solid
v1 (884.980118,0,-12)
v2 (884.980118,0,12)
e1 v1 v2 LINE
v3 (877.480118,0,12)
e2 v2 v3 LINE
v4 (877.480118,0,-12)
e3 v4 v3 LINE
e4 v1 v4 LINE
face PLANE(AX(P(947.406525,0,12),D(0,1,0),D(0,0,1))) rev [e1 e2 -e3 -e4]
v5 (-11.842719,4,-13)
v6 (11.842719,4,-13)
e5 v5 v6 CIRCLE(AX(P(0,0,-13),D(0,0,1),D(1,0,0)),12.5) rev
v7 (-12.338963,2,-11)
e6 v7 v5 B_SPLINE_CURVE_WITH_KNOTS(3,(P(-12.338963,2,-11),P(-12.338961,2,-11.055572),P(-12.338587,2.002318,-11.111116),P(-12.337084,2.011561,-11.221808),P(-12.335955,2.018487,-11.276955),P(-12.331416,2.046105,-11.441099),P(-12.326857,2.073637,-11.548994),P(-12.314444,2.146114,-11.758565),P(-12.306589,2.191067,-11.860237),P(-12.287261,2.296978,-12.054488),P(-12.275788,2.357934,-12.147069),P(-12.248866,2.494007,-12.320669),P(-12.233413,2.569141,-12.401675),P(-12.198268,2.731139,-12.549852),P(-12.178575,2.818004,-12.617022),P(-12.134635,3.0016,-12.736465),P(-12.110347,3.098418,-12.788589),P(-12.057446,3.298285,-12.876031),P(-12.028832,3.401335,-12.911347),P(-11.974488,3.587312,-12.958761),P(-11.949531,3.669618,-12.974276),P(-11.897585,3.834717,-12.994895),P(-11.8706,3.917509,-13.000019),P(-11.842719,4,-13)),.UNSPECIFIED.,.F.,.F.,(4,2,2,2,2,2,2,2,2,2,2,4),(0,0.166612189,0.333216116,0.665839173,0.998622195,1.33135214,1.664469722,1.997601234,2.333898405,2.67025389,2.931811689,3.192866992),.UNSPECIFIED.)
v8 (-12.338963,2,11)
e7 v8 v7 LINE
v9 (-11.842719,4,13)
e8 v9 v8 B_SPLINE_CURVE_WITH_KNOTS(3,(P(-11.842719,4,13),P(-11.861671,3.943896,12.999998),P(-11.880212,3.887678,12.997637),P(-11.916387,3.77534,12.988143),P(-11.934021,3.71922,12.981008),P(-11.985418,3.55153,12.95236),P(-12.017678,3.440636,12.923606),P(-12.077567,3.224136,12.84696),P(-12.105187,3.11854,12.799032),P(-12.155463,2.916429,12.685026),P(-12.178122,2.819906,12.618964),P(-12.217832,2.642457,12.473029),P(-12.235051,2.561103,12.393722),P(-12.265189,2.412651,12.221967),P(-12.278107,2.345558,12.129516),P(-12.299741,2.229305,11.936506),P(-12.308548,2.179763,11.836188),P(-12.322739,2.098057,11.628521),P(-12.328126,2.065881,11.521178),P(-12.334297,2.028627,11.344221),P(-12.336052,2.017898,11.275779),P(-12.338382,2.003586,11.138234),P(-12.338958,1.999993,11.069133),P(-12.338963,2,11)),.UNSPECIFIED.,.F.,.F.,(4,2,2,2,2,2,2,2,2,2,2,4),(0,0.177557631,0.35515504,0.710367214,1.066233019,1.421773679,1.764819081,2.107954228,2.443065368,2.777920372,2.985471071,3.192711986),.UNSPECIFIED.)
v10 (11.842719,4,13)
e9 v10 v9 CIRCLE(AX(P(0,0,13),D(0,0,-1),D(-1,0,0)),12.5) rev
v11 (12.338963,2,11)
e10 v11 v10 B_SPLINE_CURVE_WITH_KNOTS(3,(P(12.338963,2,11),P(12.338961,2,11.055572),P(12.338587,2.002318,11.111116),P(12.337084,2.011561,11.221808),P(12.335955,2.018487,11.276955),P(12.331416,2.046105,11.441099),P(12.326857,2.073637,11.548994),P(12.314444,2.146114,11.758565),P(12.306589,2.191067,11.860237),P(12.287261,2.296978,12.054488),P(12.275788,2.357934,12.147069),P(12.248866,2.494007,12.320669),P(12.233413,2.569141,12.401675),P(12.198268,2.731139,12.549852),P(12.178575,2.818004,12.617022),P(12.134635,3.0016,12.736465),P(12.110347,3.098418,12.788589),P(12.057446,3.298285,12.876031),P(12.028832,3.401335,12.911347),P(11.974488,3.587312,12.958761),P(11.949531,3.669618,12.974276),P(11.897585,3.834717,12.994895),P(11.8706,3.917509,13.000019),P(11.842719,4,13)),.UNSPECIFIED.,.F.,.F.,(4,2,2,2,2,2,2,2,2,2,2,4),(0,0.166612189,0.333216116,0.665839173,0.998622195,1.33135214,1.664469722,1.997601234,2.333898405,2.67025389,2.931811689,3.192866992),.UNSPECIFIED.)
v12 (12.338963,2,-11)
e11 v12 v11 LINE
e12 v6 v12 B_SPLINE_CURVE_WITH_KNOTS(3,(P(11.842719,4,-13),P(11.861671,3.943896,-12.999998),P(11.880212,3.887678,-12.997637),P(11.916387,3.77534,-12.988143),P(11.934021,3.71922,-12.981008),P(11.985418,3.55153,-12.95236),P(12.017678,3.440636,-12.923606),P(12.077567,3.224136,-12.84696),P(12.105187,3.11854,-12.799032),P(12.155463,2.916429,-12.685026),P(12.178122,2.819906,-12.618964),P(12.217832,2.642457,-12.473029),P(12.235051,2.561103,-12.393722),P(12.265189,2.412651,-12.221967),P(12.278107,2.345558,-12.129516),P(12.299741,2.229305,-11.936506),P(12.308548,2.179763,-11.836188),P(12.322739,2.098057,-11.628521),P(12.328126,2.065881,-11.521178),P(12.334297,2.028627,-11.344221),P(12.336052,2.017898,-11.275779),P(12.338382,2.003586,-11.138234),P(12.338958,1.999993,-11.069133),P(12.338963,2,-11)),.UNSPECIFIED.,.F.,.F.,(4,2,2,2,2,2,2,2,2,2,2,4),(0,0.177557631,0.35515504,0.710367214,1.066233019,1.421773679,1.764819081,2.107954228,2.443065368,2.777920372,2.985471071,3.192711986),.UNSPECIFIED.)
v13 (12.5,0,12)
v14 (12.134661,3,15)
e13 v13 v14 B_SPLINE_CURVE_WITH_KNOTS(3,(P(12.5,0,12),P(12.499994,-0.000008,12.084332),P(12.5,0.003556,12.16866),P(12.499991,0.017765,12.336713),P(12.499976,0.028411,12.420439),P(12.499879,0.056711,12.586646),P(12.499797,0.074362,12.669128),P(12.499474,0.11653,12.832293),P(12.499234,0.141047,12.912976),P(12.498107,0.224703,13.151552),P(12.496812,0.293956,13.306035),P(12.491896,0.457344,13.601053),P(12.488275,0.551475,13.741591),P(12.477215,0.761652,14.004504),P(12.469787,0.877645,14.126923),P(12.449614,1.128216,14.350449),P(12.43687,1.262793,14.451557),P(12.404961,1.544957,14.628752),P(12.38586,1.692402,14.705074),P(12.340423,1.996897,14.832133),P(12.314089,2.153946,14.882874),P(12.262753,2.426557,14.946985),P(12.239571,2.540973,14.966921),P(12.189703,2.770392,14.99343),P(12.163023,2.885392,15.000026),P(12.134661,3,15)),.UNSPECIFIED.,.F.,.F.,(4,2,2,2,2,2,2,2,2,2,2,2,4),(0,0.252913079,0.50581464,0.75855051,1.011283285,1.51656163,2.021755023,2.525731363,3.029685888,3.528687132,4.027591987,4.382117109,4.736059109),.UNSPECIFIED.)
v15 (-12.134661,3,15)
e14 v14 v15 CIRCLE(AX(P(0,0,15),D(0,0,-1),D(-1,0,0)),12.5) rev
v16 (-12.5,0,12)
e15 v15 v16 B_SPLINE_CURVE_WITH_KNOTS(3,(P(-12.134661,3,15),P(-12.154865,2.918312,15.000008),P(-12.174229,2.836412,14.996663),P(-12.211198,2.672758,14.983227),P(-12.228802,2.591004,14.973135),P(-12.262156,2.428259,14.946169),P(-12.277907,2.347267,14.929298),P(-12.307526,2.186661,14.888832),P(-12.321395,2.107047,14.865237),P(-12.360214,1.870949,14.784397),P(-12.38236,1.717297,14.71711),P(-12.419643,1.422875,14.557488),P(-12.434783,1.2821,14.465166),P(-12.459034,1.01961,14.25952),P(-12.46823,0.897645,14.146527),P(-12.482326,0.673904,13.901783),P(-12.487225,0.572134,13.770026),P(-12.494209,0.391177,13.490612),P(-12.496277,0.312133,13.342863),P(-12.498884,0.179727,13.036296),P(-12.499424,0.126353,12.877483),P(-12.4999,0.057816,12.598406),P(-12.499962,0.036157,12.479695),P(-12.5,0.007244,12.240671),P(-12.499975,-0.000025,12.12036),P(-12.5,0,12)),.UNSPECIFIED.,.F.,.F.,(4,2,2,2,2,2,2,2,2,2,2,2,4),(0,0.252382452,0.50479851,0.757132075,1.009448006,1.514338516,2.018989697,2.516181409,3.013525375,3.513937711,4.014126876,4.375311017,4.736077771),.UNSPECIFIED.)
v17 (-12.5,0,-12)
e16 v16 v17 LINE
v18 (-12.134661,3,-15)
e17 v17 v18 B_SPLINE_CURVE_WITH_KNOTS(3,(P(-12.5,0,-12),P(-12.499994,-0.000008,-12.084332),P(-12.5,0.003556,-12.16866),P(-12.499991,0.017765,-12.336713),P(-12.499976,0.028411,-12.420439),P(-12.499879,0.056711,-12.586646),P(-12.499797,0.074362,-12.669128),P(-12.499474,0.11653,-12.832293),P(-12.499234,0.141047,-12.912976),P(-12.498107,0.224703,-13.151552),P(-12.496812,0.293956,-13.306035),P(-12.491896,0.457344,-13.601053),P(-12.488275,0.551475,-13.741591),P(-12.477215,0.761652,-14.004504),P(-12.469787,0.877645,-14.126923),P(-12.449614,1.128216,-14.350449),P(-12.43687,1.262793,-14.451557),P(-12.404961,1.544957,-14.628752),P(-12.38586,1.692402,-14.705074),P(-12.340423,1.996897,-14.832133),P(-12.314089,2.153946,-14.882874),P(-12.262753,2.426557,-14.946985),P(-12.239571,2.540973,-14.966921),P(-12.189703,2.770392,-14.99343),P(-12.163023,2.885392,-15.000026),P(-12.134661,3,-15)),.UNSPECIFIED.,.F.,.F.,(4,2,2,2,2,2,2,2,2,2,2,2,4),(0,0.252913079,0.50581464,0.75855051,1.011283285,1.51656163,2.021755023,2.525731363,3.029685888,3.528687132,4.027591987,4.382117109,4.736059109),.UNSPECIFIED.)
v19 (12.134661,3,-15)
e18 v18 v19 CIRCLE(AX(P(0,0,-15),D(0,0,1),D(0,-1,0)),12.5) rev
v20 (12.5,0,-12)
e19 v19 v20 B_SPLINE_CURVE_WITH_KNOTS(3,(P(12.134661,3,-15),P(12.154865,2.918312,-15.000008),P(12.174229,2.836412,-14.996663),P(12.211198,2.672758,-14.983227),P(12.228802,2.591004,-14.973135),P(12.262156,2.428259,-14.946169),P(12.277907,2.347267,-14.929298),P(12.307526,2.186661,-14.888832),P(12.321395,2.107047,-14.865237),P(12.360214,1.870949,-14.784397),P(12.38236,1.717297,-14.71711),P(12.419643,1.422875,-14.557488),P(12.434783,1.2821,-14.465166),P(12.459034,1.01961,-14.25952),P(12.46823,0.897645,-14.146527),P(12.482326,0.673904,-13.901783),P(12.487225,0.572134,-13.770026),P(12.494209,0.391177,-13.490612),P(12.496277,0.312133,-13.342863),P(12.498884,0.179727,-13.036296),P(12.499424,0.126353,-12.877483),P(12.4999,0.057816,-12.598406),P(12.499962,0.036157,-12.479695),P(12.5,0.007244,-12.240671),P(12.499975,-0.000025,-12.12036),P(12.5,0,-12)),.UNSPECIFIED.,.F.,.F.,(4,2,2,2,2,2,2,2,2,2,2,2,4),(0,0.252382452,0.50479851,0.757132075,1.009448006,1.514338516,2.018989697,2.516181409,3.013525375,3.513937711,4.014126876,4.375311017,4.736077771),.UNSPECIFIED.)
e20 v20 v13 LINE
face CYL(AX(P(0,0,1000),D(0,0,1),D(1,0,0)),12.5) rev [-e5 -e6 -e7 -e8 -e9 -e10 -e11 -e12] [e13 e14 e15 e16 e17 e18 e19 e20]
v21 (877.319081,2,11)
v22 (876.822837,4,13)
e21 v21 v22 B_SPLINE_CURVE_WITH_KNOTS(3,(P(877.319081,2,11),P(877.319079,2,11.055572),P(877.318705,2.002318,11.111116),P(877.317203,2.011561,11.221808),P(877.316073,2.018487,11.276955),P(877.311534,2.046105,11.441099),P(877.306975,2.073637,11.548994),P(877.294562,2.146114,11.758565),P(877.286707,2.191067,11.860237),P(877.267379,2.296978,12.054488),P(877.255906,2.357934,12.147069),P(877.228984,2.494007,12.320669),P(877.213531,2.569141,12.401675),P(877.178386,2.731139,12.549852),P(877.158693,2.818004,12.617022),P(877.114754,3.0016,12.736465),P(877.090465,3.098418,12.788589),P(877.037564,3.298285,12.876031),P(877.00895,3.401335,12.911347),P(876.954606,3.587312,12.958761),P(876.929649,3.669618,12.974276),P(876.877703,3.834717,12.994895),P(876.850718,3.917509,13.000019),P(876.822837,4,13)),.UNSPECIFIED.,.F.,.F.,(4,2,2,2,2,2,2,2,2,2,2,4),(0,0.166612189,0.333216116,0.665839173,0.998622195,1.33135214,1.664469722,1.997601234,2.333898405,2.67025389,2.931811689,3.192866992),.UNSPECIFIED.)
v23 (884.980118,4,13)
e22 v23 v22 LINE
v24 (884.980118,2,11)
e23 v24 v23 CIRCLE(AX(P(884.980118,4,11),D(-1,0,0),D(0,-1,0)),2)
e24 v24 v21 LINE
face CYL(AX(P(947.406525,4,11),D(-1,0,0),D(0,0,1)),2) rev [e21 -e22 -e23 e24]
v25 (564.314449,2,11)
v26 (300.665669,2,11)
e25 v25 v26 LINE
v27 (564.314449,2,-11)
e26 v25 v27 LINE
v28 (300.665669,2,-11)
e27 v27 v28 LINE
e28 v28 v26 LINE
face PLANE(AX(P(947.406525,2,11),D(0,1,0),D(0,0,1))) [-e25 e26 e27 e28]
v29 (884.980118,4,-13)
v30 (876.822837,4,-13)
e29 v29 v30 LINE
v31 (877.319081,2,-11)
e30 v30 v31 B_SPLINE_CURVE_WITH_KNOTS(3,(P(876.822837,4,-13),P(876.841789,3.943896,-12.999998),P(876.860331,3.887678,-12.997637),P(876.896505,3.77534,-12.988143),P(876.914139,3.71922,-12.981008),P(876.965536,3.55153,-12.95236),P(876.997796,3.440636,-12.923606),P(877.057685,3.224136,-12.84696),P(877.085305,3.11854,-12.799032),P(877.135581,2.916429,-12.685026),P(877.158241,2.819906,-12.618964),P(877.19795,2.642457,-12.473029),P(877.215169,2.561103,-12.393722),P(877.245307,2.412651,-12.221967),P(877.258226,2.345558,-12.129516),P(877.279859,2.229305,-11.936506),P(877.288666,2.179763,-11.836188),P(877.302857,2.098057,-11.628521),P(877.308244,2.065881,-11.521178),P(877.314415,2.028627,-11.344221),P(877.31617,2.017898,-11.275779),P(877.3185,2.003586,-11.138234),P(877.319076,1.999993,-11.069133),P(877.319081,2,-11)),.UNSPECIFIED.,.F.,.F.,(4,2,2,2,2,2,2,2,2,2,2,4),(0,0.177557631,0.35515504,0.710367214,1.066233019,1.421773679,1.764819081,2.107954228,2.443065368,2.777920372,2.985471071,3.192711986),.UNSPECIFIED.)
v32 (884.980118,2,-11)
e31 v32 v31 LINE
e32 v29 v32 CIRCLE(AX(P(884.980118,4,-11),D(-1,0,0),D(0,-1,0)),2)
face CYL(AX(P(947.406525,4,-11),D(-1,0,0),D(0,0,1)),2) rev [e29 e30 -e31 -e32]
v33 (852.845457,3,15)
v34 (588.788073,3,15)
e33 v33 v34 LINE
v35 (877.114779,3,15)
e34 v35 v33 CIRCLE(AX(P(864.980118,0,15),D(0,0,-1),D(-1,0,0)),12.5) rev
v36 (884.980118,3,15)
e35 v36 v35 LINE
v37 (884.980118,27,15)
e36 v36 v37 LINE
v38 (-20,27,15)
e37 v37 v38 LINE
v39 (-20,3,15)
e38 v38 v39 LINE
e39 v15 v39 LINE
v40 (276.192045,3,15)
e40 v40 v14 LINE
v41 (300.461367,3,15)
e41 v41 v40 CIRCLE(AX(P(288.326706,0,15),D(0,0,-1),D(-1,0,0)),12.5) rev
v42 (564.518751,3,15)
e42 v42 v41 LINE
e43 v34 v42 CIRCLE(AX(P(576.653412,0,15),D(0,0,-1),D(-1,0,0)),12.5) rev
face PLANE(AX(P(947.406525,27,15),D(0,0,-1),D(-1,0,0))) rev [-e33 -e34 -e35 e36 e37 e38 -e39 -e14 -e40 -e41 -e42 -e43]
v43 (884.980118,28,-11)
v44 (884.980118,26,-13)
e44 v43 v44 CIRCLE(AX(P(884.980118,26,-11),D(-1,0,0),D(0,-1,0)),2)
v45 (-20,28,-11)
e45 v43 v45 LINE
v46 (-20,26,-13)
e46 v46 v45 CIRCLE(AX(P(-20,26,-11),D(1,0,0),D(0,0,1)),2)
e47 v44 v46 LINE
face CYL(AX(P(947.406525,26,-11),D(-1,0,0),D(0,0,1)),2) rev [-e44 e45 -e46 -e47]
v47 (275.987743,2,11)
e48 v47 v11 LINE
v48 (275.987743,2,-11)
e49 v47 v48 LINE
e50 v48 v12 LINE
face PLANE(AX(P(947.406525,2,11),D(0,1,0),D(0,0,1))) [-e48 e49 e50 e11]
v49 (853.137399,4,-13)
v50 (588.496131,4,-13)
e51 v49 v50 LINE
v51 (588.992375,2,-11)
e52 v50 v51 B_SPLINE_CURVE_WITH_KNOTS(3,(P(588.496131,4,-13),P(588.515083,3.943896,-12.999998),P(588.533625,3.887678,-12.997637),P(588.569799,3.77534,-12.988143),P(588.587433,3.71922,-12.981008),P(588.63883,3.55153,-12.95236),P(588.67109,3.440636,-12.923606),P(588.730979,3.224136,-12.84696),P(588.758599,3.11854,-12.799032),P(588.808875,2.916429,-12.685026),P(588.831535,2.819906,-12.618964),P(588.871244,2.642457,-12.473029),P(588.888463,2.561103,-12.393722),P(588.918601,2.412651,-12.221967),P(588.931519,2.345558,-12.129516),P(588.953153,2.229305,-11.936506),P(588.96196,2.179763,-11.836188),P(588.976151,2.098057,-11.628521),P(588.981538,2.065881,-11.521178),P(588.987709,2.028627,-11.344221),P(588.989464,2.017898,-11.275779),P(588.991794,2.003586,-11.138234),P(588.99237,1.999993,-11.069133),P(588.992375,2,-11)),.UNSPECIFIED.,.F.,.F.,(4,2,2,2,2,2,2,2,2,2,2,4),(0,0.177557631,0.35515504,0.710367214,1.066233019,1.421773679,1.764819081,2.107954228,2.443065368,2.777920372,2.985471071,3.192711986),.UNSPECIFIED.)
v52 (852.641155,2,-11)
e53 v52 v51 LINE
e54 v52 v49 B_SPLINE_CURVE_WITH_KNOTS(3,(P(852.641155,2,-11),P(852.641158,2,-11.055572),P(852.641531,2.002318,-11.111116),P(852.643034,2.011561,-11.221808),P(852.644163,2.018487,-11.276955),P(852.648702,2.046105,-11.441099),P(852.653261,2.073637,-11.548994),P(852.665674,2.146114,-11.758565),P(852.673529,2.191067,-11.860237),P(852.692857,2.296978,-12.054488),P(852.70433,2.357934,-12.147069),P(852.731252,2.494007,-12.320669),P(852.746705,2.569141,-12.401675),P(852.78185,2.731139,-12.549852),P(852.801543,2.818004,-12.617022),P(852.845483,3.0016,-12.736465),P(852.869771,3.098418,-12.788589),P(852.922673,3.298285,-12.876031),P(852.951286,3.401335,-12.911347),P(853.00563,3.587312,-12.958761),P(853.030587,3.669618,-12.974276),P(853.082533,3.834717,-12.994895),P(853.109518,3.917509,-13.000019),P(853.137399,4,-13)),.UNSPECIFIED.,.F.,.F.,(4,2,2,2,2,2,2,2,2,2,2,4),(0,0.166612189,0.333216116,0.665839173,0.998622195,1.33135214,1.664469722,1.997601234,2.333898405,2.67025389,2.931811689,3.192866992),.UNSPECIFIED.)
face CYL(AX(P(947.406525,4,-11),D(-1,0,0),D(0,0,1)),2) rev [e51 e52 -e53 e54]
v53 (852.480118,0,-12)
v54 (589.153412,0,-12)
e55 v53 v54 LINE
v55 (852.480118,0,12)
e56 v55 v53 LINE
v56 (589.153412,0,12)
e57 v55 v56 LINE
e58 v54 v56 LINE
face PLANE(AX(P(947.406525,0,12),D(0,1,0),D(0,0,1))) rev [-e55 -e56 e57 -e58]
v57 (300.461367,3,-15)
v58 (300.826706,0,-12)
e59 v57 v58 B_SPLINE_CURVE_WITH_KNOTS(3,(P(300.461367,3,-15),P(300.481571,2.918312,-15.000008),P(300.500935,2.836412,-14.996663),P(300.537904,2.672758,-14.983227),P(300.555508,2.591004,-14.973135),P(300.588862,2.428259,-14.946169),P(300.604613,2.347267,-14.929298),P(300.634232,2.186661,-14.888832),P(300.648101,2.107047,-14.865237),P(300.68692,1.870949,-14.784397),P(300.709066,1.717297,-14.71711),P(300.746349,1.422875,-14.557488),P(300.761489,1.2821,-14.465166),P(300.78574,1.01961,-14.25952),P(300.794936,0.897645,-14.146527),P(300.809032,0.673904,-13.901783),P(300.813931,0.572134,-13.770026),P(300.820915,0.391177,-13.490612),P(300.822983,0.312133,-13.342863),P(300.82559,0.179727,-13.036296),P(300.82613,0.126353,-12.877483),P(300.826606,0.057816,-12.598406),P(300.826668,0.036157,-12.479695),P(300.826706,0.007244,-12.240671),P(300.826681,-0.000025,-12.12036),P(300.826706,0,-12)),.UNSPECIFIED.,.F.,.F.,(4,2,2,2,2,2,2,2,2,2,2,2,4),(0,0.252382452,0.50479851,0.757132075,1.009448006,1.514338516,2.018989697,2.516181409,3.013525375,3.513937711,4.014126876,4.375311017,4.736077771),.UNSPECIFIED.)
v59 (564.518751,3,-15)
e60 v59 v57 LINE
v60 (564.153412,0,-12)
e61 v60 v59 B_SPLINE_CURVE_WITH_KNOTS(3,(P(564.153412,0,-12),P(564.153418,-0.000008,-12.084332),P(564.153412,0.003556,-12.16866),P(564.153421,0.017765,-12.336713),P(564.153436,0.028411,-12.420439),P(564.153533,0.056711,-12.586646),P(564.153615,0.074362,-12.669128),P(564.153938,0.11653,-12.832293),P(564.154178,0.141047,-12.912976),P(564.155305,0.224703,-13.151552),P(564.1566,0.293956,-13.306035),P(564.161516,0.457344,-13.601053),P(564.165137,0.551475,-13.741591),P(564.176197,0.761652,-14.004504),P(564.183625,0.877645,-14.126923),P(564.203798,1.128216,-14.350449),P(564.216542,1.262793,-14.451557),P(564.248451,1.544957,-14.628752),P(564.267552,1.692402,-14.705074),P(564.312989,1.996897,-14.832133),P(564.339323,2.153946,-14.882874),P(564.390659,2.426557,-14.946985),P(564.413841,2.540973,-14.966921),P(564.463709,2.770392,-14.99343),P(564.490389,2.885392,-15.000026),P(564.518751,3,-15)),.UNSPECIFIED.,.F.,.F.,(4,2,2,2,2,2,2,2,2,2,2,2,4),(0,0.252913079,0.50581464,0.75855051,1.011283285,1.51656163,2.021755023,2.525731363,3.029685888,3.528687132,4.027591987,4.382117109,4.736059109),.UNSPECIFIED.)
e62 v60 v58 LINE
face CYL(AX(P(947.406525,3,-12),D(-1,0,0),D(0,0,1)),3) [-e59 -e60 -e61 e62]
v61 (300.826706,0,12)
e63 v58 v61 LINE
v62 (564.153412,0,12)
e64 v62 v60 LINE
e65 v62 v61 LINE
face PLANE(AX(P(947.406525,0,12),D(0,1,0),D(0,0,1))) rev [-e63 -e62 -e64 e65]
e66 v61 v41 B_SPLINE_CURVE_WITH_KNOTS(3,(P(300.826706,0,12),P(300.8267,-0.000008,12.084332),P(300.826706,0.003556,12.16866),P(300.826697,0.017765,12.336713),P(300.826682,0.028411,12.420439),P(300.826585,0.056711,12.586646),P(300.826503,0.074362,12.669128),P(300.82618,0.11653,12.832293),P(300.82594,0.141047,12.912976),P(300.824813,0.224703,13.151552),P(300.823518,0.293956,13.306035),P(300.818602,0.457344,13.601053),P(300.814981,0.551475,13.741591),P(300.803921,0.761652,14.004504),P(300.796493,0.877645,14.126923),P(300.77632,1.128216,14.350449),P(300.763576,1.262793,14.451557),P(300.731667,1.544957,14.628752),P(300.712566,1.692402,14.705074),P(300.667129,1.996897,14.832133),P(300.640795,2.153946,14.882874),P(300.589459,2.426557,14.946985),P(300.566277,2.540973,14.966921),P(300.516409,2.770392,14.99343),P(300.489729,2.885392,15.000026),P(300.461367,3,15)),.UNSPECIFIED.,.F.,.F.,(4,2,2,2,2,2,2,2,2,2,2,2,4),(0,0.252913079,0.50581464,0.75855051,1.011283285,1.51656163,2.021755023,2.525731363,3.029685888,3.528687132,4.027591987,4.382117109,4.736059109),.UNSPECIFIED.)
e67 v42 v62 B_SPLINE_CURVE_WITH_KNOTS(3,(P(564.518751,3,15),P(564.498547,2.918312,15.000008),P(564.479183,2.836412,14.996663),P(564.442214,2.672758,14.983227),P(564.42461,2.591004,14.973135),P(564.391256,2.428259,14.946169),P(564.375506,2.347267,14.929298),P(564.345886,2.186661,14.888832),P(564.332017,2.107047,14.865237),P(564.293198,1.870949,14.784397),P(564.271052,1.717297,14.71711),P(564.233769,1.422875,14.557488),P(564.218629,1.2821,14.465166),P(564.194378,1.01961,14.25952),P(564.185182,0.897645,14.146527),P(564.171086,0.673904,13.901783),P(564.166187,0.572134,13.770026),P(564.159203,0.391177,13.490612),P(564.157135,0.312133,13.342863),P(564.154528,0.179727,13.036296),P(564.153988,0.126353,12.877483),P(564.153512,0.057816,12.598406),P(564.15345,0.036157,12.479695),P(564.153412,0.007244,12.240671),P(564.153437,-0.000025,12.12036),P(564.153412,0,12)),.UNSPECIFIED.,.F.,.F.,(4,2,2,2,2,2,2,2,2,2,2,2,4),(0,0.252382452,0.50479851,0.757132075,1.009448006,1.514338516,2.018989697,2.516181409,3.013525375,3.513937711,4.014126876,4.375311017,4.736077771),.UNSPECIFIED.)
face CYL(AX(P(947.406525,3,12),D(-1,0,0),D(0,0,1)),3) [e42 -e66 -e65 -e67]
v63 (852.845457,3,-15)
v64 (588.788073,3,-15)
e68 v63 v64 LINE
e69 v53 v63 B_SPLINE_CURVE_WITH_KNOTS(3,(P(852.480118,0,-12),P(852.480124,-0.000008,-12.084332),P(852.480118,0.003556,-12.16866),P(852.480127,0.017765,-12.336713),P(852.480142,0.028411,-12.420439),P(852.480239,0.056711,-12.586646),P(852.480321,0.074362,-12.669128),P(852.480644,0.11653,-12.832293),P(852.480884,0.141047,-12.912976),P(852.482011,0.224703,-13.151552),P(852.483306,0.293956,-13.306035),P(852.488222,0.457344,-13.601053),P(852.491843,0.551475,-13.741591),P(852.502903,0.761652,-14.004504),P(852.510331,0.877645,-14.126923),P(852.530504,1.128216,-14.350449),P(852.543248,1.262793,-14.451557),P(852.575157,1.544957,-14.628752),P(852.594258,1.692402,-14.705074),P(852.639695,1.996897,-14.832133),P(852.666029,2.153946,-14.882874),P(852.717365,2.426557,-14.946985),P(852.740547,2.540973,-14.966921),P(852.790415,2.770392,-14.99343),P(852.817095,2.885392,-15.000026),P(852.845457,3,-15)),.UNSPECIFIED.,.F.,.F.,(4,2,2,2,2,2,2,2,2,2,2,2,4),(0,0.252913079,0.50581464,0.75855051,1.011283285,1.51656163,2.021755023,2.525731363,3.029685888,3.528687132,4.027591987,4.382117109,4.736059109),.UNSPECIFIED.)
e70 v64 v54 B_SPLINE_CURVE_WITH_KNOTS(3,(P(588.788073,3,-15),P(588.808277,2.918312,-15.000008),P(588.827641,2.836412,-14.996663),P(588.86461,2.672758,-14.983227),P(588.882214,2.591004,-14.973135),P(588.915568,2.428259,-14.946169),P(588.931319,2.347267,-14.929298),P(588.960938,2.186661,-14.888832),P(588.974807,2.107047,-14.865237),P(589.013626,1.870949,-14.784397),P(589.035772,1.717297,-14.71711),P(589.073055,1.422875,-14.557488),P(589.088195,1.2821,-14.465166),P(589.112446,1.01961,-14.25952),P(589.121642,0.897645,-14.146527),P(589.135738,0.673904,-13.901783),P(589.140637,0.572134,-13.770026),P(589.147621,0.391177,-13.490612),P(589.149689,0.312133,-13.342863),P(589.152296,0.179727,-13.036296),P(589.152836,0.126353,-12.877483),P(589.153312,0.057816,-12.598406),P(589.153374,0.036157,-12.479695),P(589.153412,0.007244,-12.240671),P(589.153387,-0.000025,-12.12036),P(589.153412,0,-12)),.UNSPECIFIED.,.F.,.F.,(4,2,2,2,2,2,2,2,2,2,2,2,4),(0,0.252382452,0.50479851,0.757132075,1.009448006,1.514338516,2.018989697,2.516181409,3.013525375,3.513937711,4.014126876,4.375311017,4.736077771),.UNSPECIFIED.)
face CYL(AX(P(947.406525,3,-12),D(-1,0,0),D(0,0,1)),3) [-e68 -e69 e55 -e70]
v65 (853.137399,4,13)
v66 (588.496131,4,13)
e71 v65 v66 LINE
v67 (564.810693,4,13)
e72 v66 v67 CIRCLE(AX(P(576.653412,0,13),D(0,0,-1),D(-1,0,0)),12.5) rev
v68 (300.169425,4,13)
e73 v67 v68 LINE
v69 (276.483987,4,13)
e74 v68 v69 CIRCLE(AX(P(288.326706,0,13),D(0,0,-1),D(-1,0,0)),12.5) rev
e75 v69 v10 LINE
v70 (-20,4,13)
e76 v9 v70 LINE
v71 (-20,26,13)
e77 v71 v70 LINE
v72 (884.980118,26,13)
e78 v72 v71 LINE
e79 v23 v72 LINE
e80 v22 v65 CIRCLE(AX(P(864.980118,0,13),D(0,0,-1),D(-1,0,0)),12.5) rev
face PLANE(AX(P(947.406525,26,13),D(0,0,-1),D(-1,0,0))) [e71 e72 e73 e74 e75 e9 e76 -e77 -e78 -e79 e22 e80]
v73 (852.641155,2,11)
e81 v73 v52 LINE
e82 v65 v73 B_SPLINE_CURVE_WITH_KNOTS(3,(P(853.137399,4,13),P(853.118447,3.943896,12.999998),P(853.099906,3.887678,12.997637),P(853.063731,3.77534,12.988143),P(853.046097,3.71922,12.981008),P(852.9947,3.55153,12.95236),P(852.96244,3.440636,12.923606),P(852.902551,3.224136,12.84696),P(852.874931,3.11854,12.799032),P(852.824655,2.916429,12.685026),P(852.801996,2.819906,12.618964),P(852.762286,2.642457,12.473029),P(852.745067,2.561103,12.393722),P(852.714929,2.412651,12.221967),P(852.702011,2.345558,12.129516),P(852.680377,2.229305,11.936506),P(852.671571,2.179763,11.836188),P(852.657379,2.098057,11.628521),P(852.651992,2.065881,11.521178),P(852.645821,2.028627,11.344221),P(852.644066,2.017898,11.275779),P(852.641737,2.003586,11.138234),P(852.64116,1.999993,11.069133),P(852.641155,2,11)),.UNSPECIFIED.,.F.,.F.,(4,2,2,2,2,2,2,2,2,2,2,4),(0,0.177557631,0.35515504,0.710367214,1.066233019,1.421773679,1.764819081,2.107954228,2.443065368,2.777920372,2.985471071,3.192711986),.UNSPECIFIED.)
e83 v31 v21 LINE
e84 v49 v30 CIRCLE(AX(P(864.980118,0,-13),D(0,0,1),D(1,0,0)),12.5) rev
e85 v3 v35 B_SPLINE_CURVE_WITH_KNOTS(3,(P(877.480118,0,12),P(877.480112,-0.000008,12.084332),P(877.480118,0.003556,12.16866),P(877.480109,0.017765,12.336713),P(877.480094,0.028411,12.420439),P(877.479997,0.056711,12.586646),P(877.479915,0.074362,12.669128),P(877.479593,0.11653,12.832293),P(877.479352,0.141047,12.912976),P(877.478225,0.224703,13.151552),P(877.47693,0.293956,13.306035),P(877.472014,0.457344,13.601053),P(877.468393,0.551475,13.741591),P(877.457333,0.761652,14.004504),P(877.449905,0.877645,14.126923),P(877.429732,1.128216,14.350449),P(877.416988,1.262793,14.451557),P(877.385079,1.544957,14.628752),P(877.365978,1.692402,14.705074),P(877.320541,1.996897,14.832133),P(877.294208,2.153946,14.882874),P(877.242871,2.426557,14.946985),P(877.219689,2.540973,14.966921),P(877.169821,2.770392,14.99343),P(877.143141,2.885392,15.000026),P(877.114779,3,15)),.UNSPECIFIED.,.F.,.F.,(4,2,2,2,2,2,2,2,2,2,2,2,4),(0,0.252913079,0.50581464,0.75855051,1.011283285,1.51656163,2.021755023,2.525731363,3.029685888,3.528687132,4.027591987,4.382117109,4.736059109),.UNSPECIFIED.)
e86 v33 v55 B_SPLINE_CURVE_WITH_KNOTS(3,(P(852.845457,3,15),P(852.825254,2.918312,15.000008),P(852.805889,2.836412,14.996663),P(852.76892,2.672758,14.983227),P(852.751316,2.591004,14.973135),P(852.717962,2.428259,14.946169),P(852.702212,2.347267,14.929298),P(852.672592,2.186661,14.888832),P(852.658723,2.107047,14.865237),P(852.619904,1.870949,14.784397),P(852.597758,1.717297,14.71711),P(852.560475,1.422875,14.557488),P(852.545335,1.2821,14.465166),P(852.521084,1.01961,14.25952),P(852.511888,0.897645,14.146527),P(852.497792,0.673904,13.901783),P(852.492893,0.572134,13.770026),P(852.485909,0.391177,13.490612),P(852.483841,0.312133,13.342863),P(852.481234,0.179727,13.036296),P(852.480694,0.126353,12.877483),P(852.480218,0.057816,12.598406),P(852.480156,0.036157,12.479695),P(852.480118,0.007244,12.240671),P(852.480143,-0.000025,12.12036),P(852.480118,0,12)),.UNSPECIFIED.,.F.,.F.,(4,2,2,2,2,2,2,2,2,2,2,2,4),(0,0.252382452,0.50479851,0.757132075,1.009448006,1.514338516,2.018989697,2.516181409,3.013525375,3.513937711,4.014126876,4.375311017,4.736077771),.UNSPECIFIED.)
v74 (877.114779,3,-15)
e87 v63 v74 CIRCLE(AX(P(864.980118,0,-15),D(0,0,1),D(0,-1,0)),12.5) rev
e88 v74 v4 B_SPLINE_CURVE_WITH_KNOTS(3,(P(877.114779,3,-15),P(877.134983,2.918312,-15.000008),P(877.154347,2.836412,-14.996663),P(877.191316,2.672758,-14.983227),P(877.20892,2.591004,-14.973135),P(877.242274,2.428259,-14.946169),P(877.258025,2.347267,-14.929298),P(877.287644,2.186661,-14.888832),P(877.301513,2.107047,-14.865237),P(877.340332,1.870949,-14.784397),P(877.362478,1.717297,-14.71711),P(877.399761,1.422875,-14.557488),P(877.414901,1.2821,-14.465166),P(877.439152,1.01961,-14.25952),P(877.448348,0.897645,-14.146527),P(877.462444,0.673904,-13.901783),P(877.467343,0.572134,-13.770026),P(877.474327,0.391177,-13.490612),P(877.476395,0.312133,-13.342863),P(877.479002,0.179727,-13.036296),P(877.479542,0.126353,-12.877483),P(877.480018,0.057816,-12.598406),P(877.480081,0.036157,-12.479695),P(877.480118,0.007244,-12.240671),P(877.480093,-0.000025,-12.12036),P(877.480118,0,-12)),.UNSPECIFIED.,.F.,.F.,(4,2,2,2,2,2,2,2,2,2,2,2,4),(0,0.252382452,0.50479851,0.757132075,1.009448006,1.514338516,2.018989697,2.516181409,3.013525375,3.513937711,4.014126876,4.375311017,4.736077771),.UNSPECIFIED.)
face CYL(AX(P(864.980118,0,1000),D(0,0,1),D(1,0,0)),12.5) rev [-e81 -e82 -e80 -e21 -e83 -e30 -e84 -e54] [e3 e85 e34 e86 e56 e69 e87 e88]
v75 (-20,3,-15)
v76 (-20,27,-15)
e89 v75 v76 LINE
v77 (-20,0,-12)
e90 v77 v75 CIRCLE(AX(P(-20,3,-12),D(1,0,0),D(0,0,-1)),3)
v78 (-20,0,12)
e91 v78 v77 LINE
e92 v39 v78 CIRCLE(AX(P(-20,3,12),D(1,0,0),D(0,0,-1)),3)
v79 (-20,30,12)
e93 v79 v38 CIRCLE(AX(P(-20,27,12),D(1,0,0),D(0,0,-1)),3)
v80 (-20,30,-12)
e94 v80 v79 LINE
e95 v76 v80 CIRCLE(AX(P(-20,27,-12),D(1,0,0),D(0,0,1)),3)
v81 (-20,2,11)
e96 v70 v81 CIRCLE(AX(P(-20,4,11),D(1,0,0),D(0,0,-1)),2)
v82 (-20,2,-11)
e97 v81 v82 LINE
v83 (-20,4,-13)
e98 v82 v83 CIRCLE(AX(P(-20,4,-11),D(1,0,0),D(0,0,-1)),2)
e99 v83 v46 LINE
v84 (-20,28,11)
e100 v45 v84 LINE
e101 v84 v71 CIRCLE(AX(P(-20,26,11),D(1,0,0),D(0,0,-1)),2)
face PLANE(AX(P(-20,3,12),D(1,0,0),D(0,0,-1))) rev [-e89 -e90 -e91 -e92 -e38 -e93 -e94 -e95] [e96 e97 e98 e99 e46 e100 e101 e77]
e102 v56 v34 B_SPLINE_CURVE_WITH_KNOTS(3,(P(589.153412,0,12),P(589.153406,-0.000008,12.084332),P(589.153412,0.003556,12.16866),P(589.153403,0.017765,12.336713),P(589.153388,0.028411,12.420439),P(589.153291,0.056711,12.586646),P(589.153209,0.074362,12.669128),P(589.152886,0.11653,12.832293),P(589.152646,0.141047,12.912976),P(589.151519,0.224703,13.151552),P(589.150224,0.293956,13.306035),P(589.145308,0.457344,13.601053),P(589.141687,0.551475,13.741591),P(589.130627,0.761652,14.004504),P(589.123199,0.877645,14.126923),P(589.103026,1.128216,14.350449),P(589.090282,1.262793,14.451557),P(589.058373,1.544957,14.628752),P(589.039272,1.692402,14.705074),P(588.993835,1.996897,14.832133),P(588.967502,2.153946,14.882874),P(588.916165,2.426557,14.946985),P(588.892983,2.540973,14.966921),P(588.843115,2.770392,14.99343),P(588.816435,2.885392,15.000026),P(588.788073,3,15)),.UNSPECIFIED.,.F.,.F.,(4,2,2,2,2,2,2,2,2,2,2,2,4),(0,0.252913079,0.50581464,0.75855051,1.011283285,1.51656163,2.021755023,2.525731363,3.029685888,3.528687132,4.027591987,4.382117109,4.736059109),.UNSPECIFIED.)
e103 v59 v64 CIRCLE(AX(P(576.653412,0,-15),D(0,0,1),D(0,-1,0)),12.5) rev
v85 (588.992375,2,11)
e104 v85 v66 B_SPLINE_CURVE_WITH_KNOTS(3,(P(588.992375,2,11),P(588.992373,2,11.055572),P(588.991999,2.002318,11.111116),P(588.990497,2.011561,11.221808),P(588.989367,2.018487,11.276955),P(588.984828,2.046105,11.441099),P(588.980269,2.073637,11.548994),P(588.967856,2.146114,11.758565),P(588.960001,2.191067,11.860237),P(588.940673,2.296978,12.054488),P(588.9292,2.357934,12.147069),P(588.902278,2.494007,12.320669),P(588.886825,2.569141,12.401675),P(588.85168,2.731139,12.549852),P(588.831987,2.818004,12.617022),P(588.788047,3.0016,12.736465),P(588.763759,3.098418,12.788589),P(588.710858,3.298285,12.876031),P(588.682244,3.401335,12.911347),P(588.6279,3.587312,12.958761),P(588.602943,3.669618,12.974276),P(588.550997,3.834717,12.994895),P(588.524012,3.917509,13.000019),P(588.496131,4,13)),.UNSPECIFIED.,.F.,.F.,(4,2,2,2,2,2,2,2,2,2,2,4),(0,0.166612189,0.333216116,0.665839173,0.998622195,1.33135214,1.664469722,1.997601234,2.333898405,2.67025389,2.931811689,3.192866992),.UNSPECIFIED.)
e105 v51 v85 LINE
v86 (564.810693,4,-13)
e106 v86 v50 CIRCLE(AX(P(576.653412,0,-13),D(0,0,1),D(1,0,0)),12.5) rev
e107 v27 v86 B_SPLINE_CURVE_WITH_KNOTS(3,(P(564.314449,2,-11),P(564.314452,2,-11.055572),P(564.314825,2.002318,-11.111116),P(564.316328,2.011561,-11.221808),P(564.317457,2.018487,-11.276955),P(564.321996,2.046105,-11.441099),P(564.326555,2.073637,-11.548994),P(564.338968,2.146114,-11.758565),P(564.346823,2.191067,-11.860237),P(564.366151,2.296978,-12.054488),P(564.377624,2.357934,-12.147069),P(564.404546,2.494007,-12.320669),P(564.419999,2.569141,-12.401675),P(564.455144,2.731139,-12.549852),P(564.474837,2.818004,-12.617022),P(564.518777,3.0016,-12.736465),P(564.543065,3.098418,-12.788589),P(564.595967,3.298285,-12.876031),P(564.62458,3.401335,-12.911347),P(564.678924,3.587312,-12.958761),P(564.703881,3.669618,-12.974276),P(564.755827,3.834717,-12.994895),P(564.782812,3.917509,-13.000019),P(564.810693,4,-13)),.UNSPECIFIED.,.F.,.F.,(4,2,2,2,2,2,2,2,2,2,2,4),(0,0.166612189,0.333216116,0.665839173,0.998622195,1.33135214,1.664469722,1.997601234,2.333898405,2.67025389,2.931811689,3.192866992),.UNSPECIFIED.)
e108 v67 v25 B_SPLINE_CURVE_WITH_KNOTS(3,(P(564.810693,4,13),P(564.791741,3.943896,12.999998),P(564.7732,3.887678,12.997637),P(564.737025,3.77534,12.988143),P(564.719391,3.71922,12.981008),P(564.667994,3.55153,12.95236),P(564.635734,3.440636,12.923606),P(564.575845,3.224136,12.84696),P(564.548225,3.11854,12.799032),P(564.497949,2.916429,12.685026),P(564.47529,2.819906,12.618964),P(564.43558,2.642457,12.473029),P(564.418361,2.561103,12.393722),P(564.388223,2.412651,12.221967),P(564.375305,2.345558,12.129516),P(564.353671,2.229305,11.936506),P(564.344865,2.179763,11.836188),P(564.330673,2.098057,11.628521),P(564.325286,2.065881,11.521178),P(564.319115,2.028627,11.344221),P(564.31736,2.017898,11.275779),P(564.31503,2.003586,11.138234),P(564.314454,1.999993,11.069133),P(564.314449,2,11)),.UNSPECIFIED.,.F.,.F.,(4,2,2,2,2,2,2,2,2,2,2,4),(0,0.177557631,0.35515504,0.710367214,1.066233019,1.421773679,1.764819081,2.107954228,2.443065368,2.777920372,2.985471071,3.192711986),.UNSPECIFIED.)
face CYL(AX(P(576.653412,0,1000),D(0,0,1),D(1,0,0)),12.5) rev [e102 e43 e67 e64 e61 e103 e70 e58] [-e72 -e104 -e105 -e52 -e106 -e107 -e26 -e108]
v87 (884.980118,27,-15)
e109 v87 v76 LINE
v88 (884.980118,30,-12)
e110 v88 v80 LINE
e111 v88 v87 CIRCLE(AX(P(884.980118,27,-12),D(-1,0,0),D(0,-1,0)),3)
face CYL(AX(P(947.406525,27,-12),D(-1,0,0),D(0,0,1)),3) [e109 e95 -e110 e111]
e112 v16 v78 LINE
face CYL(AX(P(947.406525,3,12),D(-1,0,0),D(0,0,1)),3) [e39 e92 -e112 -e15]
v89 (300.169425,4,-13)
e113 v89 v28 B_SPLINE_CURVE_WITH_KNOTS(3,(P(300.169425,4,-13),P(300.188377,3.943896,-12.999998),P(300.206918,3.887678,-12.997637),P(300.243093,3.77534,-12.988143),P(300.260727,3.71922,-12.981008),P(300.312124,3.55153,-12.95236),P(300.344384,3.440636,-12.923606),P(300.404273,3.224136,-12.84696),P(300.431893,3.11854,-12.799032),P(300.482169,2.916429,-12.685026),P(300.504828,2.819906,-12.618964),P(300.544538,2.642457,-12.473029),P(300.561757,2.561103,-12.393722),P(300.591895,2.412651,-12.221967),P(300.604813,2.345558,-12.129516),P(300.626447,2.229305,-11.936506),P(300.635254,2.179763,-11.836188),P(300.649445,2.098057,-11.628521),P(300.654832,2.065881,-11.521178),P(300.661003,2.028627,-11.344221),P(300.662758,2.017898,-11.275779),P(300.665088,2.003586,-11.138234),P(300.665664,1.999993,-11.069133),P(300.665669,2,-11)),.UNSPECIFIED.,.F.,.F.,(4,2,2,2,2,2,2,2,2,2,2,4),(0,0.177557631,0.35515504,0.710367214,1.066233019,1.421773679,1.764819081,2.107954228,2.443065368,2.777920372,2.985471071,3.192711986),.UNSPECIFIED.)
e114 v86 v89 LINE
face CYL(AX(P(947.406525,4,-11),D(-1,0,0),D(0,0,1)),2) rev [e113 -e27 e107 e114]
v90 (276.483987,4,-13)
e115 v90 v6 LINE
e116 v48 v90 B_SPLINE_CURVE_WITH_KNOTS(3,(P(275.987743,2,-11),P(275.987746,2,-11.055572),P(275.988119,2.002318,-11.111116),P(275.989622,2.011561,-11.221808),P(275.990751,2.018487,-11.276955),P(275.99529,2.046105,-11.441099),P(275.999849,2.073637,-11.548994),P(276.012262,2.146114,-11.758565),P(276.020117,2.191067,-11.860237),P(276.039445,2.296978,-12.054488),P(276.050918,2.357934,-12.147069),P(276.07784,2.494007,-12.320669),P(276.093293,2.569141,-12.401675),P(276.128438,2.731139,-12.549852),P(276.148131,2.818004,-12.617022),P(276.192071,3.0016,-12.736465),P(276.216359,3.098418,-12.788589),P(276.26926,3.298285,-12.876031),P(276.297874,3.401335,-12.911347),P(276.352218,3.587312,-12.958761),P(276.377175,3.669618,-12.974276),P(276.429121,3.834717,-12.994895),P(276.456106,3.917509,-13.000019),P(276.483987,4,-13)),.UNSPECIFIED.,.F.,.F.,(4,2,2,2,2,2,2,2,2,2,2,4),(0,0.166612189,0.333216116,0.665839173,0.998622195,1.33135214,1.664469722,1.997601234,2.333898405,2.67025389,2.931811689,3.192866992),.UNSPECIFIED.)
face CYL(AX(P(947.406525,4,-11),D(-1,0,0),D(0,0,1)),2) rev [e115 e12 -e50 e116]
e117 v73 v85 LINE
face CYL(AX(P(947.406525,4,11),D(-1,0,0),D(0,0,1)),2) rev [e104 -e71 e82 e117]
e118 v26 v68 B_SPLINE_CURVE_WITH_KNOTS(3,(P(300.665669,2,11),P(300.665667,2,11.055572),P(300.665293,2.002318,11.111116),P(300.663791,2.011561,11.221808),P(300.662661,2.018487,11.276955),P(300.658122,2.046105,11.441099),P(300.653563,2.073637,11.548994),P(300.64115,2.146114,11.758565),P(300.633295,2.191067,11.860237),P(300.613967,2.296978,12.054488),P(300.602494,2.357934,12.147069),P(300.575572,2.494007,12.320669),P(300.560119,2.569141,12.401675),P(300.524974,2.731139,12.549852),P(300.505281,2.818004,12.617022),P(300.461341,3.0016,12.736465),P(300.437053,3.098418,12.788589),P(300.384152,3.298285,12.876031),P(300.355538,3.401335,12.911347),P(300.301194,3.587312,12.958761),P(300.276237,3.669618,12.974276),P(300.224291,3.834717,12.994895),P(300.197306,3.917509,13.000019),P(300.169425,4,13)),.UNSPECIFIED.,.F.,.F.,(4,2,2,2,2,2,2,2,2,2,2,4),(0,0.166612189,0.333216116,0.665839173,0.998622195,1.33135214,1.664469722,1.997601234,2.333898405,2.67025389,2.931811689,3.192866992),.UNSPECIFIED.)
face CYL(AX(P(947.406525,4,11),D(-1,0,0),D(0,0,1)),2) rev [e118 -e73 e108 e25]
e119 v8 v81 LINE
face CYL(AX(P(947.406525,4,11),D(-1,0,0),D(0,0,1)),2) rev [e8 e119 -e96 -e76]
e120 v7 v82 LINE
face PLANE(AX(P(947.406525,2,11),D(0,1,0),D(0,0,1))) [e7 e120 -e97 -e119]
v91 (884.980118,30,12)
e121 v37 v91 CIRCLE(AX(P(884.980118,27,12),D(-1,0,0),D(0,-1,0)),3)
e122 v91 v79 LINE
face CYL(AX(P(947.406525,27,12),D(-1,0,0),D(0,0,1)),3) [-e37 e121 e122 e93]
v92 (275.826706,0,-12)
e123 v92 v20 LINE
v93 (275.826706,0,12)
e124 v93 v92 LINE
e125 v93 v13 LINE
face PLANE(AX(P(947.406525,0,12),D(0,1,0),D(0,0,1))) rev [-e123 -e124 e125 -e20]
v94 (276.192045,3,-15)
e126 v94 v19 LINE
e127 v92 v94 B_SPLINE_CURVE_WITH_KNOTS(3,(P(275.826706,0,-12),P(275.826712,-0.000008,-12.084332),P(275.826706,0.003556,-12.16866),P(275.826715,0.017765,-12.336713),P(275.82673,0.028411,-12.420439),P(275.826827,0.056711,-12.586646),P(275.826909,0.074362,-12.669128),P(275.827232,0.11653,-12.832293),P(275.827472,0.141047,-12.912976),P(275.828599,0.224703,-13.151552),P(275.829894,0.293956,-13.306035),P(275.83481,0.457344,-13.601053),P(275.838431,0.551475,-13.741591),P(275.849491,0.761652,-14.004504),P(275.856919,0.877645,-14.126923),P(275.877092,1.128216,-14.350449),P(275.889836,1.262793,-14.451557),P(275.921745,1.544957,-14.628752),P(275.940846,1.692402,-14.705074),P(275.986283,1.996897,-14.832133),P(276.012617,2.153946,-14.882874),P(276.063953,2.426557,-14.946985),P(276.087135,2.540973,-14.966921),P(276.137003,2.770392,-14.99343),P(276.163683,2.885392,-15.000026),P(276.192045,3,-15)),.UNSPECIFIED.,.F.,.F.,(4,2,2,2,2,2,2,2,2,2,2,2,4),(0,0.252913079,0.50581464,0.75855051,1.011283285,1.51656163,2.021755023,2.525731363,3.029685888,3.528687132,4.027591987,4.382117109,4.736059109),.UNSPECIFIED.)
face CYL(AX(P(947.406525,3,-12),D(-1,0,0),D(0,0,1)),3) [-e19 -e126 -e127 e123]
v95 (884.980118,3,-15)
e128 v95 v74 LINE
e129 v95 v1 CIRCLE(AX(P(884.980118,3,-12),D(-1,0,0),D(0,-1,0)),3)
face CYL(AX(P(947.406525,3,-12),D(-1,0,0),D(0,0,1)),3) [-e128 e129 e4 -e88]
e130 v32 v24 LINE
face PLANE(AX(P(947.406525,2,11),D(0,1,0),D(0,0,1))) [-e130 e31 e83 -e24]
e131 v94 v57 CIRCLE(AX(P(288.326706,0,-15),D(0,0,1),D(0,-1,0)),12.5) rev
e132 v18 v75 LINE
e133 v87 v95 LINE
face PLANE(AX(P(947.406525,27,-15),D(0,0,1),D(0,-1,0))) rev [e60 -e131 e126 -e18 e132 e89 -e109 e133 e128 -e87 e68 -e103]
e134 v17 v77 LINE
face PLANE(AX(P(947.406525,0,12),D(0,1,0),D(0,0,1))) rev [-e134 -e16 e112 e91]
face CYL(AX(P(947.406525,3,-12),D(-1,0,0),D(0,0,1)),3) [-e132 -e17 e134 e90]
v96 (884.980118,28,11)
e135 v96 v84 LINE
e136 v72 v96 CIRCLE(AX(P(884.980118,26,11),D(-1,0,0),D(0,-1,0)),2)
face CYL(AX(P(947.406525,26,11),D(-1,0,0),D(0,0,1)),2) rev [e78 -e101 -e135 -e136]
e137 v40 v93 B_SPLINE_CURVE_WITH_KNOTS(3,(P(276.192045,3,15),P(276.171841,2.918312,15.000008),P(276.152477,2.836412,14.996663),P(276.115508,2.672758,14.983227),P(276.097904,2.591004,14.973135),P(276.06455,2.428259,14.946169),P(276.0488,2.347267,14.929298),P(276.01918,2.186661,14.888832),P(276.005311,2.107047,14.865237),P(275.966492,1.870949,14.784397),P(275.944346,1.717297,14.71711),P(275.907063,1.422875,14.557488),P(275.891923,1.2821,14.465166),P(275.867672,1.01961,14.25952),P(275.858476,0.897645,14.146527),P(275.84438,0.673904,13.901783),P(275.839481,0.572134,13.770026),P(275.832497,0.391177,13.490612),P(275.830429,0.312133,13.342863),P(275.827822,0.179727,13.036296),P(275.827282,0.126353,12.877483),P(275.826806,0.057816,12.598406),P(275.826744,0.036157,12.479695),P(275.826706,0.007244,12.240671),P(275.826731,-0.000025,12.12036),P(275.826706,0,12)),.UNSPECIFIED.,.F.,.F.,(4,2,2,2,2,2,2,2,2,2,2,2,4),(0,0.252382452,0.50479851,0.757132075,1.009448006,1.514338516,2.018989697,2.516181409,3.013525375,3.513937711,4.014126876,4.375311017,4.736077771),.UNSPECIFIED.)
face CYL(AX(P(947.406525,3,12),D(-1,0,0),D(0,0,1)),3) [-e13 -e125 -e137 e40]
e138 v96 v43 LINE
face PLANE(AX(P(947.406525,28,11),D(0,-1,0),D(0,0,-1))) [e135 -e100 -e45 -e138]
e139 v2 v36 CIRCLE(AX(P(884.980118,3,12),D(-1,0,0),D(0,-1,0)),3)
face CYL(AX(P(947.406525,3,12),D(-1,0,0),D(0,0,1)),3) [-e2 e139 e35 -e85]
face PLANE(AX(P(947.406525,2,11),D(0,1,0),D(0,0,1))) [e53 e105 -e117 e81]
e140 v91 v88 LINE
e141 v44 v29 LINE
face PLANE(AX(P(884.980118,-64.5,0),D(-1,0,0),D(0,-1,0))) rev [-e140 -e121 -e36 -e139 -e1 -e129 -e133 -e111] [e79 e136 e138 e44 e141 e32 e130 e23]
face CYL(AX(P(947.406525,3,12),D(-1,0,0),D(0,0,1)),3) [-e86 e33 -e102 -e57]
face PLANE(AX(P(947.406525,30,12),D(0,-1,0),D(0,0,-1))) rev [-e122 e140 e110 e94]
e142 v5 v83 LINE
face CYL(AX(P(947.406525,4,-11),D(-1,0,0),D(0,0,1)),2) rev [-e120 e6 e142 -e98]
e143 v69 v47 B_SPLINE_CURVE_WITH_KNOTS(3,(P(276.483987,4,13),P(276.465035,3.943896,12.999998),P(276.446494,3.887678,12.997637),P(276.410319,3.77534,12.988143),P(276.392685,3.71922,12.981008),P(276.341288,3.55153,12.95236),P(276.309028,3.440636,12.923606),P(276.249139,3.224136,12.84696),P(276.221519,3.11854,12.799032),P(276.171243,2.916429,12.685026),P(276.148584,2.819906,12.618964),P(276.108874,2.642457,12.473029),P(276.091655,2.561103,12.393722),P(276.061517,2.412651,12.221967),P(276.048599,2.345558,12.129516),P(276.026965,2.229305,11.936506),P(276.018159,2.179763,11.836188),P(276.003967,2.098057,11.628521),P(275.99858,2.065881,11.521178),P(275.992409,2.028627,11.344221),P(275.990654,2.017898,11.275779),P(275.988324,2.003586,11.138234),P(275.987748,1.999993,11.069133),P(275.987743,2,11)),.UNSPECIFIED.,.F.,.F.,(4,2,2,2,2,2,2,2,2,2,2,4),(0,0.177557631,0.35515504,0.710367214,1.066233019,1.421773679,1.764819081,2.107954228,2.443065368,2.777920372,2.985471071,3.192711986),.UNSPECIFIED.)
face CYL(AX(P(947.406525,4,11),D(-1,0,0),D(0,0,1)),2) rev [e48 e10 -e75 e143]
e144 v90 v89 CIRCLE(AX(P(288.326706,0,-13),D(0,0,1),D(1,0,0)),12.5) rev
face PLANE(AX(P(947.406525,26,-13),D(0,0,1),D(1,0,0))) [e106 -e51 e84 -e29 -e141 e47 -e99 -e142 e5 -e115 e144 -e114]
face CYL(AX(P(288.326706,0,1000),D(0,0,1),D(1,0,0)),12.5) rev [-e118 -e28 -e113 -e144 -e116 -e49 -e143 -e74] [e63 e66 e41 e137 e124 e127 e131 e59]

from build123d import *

# Parameters (mm, degrees)
EXTRUDE_1_DEPTH      = 884.980118
EXTRUDE_1_DEPTH_BACK = 20
OTHER_START          = -15
OTHER_2_DEPTH        = 30


# Read off the part's stored shape, not the designer's step: Полость2
with BuildPart() as part:
    # Эскиз1 → Бобышка-Вытянуть1 (new, two sides: drawn at the far end of the back side and taken through both)
    with BuildSketch(Plane(origin=(0, 0, 0), x_dir=(0, 0, -1), z_dir=(1, 0, 0)).offset(-EXTRUDE_1_DEPTH_BACK)):
        with BuildLine():
            Line((-12, 30), (12, 30))
            ThreePointArc((12, 30), (14.121320344, 29.121320344), (15, 27))
            Line((15, 27), (15, 3))
            ThreePointArc((15, 3), (14.121320344, 0.878679656), (12, 0))
            Line((12, 0), (-12, 0))
            ThreePointArc((-12, 0), (-14.121320344, 0.878679656), (-15, 3))
            Line((-15, 3), (-15, 27))
            ThreePointArc((-15, 27), (-14.121320344, 29.121320344), (-12, 30))
        make_face()
        with BuildLine():
            Line((-11, 28), (11, 28))
            ThreePointArc((11, 28), (12.414213562, 27.414213562), (13, 26))
            Line((13, 26), (13, 4))
            ThreePointArc((13, 4), (12.414213562, 2.585786438), (11, 2))
            Line((11, 2), (-11, 2))
            ThreePointArc((-11, 2), (-12.414213562, 2.585786438), (-13, 4))
            Line((-13, 4), (-13, 26))
            ThreePointArc((-13, 26), (-12.414213562, 27.414213562), (-11, 28))
        make_face(mode=Mode.SUBTRACT)
    extrude(amount=EXTRUDE_1_DEPTH + EXTRUDE_1_DEPTH_BACK)

    # Полость2 outline → Полость2 (cut)
    with BuildSketch(Plane.XY.offset(OTHER_START)):
        with BuildLine():
            Line((852.480118087, -4.981e-06), (877.480118087, -4.981e-06))
            ThreePointArc((877.480118087, -4.981e-06), (877.439793915, 1.003233908), (877.319080766, 2))
            Line((877.319080766, 2), (852.641155408, 2))
            ThreePointArc((852.641155408, 2), (852.52044226, 1.003233908), (852.480118087, -4.981e-06))
        make_face()
        with BuildLine():
            Line((852.641155408, 2), (877.319080766, 2))
            ThreePointArc((877.319080766, 2), (864.980118087, 12.5), (852.641155408, 2))
        make_face()
        with BuildLine():
            Line((564.153412058, -4.981e-06), (589.153412058, -4.981e-06))
            ThreePointArc((589.153412058, -4.981e-06), (589.113087885, 1.003233908), (588.992374737, 2))
            Line((588.992374737, 2), (564.314449379, 2))
            ThreePointArc((564.314449379, 2), (564.193736231, 1.003233908), (564.153412058, -4.981e-06))
        make_face()
        with BuildLine():
            Line((564.314449379, 2), (588.992374737, 2))
            ThreePointArc((588.992374737, 2), (576.653412058, 12.5), (564.314449379, 2))
        make_face()
        with BuildLine():
            Line((275.826706029, -4.981e-06), (300.826706029, -4.981e-06))
            ThreePointArc((300.826706029, -4.981e-06), (300.786381856, 1.003233908), (300.665668708, 2))
            Line((300.665668708, 2), (275.98774335, 2))
            ThreePointArc((275.98774335, 2), (275.867030202, 1.003233908), (275.826706029, -4.981e-06))
        make_face()
        with BuildLine():
            Line((275.98774335, 2), (300.665668708, 2))
            ThreePointArc((300.665668708, 2), (288.326706029, 12.5), (275.98774335, 2))
        make_face()
        with BuildLine():
            Line((-12.5, -4.981e-06), (12.5, -4.981e-06))
            ThreePointArc((12.5, -4.981e-06), (12.459675827, 1.003233908), (12.338962679, 2))
            Line((12.338962679, 2), (-12.338962679, 2))
            ThreePointArc((-12.338962679, 2), (-12.459675827, 1.003233908), (-12.5, -4.981e-06))
        make_face()
        with BuildLine():
            Line((-12.338962679, 2), (12.338962679, 2))
            ThreePointArc((12.338962679, 2), (0, 12.5), (-12.338962679, 2))
        make_face()
    extrude(amount=OTHER_2_DEPTH, mode=Mode.SUBTRACT)


solid = part.part
